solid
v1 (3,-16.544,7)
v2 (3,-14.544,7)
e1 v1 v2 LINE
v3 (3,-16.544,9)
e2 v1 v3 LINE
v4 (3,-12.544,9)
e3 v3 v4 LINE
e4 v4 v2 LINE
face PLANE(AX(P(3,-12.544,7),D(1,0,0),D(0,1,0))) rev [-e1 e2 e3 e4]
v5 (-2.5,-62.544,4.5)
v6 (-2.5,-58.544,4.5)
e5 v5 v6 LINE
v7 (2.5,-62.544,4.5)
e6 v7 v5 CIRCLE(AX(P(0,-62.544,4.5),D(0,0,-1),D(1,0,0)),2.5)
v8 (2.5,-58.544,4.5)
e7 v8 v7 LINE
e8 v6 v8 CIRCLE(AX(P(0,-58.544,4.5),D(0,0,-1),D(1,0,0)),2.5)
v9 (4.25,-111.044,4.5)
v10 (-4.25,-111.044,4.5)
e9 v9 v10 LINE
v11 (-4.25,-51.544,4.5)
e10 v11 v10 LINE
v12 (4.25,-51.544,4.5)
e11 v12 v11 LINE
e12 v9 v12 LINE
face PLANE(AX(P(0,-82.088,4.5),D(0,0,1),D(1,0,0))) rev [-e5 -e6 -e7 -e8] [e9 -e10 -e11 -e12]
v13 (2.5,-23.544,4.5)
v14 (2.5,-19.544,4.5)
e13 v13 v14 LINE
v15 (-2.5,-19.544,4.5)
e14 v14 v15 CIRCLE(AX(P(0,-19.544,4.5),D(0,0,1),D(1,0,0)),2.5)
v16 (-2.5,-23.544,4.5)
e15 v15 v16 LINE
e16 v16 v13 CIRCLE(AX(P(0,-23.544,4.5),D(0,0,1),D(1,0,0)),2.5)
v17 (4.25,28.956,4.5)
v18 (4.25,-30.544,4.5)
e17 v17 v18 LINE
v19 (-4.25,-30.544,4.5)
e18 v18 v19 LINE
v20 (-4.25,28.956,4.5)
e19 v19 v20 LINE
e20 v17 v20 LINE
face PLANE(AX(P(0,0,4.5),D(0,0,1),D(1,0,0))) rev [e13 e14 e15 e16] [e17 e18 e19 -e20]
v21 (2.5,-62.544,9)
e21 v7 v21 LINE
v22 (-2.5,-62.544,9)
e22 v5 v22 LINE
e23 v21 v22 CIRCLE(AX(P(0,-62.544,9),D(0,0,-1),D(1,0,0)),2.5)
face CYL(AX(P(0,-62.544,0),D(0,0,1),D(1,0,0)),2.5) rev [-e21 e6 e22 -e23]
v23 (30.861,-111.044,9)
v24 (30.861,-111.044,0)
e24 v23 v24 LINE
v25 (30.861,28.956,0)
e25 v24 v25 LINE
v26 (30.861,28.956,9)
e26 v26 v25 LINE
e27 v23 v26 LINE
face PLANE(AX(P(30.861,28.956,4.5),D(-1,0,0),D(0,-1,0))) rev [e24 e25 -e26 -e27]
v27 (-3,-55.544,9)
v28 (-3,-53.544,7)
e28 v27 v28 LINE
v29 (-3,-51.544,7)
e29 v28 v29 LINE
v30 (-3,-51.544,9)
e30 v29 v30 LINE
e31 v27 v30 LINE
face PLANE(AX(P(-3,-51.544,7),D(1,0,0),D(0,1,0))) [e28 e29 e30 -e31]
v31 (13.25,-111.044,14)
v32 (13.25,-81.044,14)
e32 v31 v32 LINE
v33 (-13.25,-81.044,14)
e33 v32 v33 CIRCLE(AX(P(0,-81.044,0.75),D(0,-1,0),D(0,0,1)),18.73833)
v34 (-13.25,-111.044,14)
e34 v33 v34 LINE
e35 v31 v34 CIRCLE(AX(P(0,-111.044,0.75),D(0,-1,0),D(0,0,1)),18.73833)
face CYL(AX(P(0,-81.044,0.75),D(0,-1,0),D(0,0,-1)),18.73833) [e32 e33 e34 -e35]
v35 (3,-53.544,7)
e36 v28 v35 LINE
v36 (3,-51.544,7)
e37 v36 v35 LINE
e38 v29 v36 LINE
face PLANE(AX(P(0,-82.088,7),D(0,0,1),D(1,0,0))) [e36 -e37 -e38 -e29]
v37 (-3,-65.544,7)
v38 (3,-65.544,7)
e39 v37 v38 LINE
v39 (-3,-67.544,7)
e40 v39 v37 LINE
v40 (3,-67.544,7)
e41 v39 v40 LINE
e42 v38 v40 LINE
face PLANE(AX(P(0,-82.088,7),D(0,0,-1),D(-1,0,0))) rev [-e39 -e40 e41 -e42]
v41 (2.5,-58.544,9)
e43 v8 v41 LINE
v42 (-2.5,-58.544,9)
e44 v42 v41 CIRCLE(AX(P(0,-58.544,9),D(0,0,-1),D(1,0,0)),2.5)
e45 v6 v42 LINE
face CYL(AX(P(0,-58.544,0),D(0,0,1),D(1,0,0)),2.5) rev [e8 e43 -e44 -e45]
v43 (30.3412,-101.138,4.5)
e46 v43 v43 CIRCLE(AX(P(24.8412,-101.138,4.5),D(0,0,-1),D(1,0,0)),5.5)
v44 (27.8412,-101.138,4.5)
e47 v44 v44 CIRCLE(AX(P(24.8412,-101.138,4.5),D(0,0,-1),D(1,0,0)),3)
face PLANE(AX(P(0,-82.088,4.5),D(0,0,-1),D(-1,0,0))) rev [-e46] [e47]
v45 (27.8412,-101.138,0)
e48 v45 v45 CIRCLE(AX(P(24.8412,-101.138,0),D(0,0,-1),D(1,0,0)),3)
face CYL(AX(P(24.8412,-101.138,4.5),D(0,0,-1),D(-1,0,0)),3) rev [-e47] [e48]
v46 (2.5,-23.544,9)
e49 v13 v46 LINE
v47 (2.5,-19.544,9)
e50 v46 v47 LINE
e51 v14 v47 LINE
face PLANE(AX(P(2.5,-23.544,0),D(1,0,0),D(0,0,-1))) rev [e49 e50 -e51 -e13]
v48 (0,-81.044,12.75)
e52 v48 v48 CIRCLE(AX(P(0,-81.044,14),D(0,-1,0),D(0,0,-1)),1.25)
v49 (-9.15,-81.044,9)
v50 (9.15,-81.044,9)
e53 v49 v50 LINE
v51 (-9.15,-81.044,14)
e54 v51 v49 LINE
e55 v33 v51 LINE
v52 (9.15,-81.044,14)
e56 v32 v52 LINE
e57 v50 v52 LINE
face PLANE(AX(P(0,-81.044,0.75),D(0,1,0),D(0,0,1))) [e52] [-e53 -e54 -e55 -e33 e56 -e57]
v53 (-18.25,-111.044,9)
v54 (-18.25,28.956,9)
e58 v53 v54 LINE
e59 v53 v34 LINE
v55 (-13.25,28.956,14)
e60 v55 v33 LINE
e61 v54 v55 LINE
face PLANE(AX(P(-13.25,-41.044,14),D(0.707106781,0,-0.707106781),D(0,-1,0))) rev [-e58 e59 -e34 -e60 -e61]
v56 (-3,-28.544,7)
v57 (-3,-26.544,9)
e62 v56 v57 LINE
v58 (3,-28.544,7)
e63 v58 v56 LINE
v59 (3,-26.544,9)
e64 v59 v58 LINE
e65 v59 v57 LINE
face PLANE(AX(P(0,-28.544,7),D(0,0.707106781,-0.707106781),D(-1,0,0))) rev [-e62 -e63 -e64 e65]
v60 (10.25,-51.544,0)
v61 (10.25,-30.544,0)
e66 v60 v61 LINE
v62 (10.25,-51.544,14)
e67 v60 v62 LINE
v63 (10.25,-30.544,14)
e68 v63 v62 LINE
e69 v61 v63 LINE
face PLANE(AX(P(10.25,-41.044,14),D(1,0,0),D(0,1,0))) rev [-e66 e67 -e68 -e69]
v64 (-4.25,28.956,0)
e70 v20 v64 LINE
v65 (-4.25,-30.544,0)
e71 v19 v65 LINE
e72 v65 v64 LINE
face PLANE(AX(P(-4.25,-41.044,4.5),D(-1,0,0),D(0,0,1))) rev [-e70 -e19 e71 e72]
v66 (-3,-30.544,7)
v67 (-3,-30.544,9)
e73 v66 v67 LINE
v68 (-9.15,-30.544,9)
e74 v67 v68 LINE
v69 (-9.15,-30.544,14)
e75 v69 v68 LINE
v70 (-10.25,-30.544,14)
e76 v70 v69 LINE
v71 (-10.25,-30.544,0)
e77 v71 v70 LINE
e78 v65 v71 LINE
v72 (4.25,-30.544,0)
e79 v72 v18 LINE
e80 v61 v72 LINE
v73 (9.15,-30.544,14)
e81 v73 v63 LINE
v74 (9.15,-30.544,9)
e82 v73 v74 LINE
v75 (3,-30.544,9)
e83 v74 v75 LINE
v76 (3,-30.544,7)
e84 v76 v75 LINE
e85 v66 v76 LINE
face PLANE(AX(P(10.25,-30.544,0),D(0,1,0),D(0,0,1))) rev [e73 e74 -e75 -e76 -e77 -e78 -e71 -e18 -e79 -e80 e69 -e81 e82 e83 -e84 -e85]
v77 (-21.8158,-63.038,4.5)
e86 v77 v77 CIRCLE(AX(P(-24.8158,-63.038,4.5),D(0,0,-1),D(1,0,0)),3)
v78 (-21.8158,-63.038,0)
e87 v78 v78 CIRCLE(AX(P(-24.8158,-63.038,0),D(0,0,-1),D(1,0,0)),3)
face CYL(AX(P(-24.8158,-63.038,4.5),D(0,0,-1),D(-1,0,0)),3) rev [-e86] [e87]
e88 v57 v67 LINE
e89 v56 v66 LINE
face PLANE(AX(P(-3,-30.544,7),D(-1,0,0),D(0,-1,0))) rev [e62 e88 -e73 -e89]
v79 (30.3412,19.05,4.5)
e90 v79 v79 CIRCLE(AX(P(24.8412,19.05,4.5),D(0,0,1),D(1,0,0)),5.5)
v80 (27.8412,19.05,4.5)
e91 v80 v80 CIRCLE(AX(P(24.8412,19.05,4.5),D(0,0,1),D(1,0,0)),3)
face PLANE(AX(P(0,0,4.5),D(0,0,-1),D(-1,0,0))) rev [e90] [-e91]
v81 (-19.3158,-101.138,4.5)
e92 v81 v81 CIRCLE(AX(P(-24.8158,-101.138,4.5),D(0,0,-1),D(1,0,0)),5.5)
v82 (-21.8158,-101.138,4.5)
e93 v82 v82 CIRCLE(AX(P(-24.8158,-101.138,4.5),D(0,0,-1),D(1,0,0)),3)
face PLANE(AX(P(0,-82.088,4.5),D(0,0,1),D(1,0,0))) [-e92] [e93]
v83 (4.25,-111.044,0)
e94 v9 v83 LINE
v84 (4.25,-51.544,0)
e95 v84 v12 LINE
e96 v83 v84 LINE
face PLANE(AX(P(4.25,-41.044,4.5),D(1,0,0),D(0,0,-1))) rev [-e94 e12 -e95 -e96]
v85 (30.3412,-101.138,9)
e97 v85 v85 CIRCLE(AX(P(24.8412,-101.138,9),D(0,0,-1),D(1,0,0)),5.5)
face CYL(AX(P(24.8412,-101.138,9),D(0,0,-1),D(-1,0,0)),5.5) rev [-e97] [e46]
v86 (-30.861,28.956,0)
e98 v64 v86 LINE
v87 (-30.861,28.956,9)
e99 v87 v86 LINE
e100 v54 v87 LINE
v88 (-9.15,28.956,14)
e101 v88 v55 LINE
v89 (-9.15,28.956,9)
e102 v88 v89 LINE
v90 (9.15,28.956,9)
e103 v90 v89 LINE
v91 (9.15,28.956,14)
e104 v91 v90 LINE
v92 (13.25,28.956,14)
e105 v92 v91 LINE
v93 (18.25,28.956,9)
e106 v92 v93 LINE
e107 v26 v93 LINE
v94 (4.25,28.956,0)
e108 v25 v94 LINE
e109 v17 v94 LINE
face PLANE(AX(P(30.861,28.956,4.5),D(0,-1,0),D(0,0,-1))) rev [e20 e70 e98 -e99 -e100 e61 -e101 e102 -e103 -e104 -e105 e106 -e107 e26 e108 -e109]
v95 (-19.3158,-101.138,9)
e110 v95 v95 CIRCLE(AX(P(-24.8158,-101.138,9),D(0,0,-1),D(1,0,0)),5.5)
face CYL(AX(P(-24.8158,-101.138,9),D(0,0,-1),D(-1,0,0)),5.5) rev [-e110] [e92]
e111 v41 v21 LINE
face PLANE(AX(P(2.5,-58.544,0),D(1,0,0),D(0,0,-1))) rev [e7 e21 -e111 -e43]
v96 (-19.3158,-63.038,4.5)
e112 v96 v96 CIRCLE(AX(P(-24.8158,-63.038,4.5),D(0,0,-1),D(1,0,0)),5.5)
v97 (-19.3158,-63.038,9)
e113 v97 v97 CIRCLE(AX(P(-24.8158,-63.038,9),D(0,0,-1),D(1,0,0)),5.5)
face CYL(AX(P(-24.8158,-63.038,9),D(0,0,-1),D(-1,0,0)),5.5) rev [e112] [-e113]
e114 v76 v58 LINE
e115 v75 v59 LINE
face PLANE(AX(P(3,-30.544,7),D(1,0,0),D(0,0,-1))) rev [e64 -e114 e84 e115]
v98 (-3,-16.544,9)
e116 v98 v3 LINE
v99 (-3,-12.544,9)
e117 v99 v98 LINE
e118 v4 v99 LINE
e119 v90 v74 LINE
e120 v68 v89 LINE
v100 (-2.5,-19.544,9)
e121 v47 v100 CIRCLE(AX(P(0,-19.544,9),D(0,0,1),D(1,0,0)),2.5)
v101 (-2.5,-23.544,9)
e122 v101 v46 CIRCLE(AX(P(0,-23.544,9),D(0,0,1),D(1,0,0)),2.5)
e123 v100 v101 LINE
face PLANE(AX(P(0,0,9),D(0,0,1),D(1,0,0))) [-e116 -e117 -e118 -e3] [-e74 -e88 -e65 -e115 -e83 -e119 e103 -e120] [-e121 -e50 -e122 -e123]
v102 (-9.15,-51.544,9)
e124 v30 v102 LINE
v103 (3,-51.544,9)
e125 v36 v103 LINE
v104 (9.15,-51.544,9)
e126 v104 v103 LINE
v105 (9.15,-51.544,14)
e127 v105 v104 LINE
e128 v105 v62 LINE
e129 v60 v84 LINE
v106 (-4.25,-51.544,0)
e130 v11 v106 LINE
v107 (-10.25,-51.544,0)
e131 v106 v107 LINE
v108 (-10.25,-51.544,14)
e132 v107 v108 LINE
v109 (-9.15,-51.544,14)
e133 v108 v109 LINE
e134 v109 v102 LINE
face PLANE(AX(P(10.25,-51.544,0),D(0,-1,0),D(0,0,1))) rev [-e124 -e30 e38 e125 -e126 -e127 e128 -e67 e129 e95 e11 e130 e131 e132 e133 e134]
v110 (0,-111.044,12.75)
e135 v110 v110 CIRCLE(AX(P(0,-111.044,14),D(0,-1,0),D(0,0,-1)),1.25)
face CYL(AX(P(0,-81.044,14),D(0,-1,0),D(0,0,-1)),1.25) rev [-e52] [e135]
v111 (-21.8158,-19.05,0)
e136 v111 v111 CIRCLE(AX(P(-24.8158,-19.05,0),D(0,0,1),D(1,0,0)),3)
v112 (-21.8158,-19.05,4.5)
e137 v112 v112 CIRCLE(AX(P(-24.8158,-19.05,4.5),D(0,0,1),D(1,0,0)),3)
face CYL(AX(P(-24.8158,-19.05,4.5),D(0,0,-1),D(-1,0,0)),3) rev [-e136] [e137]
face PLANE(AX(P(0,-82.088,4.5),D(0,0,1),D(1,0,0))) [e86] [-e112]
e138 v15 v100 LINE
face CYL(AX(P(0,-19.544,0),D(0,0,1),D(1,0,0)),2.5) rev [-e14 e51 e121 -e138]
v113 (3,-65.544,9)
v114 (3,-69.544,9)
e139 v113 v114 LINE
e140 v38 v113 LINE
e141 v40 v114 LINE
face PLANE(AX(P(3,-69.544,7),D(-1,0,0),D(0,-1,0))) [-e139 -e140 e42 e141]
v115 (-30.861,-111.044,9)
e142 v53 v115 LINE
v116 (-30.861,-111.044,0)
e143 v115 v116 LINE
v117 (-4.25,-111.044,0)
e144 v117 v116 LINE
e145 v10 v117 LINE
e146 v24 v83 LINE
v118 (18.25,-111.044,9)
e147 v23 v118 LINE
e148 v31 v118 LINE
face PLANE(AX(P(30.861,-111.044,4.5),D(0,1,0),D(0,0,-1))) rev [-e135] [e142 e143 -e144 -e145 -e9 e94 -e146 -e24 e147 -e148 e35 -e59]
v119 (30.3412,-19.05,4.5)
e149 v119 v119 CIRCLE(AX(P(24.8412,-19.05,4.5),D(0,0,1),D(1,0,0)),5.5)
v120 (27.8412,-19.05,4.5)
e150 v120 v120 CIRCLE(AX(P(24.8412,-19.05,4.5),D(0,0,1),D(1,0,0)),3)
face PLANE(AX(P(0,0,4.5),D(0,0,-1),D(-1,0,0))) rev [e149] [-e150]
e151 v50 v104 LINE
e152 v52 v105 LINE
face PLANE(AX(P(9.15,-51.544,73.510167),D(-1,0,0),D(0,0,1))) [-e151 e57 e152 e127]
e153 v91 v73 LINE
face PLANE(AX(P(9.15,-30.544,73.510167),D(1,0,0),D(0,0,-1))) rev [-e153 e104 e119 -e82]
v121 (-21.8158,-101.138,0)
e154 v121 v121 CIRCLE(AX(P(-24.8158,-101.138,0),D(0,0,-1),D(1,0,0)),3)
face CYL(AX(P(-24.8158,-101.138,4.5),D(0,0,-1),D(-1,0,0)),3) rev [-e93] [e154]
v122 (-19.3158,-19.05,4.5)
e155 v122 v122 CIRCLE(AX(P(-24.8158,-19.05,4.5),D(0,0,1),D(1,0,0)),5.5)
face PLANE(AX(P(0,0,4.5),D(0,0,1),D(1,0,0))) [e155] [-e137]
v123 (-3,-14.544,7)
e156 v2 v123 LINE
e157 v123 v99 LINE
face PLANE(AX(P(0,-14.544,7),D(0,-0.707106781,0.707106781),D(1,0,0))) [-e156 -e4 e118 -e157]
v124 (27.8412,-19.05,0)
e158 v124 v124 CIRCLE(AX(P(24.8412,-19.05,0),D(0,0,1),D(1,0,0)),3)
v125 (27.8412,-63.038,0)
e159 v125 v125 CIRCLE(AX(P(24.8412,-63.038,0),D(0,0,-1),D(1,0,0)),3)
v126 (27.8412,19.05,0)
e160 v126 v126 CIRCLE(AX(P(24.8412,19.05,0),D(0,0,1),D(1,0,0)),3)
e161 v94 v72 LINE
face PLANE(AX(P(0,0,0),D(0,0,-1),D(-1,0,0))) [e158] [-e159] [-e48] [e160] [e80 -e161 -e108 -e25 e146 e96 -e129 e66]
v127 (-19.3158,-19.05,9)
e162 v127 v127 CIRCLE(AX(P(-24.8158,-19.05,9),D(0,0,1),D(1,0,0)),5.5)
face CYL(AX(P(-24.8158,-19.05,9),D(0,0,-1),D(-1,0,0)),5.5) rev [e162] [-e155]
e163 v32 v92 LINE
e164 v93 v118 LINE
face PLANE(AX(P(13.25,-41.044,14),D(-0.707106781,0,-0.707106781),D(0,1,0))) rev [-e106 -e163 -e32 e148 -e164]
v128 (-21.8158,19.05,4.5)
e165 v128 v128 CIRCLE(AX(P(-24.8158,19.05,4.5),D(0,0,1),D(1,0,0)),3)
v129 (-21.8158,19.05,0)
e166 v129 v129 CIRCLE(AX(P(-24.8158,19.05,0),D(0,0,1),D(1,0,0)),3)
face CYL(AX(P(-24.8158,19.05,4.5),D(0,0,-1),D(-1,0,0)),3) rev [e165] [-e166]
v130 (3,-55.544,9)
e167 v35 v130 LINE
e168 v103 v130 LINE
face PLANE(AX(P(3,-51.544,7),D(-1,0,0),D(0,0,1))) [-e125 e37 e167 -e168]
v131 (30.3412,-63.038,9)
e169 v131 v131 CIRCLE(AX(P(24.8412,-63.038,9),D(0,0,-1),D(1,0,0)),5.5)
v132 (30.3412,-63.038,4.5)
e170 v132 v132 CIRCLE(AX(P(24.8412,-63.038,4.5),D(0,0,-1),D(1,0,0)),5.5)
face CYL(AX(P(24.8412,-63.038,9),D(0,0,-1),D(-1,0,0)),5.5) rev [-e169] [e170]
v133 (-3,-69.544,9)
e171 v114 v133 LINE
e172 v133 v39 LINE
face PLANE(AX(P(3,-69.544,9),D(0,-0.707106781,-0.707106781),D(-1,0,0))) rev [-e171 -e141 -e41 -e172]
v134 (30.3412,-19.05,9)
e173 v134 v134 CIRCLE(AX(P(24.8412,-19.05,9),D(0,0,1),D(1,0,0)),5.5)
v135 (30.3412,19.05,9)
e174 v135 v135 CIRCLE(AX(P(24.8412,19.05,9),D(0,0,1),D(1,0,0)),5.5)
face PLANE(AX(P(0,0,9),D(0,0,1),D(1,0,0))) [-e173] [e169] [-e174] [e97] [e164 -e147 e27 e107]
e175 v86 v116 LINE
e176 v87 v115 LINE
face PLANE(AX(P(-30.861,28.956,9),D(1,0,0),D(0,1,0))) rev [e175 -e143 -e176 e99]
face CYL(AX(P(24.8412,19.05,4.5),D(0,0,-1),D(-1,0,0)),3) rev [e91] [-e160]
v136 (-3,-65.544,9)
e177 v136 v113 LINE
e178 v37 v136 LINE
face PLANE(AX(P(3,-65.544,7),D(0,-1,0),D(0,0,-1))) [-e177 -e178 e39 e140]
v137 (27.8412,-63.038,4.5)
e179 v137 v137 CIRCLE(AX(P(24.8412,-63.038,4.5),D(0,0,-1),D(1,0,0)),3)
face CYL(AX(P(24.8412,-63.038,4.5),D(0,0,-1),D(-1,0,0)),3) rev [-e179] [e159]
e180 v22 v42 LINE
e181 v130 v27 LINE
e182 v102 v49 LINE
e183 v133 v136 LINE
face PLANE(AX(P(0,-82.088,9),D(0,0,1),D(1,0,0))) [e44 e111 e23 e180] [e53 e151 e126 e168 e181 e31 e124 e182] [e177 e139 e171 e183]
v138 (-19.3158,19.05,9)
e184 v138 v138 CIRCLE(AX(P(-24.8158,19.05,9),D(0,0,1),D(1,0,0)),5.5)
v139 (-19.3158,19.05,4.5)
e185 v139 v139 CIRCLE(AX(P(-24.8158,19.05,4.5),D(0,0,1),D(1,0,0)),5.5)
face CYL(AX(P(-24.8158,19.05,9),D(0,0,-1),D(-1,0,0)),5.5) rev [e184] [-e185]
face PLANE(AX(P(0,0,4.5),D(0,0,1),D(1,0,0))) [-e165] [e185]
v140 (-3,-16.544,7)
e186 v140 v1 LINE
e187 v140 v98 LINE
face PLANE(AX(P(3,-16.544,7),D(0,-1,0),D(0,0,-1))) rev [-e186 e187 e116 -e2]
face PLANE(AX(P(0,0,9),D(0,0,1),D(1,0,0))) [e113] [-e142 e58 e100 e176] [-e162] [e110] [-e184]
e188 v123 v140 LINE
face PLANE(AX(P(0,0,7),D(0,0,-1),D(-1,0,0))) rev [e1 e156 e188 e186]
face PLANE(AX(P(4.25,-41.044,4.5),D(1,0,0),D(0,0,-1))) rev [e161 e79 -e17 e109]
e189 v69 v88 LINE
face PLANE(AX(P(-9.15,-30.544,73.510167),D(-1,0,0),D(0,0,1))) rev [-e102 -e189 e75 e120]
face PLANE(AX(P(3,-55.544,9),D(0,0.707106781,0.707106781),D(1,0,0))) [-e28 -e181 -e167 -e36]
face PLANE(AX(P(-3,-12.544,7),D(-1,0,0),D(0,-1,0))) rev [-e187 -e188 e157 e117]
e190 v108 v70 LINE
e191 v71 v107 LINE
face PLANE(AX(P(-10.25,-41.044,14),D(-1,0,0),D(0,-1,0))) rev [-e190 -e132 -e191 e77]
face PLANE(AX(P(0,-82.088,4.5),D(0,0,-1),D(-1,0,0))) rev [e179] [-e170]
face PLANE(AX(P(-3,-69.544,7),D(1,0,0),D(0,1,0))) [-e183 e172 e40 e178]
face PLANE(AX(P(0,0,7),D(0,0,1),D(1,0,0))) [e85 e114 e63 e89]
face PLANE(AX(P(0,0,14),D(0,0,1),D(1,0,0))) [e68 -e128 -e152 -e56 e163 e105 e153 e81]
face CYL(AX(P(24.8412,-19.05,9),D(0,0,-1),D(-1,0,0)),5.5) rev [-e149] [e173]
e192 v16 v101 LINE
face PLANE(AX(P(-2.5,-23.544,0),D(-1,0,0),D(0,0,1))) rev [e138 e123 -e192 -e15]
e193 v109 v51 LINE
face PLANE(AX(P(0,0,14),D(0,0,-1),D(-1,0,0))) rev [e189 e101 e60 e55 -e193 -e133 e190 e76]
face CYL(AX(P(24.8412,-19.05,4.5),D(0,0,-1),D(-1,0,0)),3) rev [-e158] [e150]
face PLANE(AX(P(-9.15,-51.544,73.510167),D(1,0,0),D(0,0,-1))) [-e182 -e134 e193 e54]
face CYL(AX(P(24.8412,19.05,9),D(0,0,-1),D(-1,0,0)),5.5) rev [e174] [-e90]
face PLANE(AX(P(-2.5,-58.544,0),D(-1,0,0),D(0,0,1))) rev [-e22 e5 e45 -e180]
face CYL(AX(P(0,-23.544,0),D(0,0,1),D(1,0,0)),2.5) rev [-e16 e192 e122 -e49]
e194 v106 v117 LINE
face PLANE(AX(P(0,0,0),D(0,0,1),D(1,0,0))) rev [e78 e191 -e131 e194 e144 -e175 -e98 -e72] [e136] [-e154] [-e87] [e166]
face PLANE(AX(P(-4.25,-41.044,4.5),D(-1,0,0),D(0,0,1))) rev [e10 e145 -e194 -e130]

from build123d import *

# Parameters (mm, degrees)
SKETCH1_W                = 26.611
SKETCH1_H                = 70
SKETCH1_R                = 3
BOSS_EXTRUDE1_DEPTH      = 4.5
BOSS_EXTRUDE1_2_DEPTH    = 4.5
SKETCH2_W                = 61.722
SKETCH2_H                = 70
SKETCH2_R                = 5.5
BOSS_EXTRUDE2_DEPTH      = 4.5
SKETCH3_W                = 3
SKETCH3_H                = 70
BOSS_EXTRUDE3_DEPTH      = 5
CHAMFER1_SIZE            = 5
CUT_EXTRUDE1_DEPTH       = 53.134549552
CUT_EXTRUDE1_DEPTH_BACK  = 53.134549552
SKETCH4_W                = 20.5
SKETCH4_H                = 10.5
MIRROR1_OUTLINE_R        = 5.5
MIRROR1_DEPTH            = 9
MIRROR1_START            = 4.5
MIRROR1_2_OUTLINE_W      = 8.5
MIRROR1_2_OUTLINE_H      = 59.5
MIRROR1_2_DEPTH          = 4.5
MIRROR1_3_OUTLINE_R      = 5.5
MIRROR1_3_OUTLINE_R_2    = 3
MIRROR1_3_DEPTH          = 4.5
MIRROR1_START_2          = -111.044
MIRROR1_4_DEPTH          = 70
SKETCH5_R                = 1.25
BOSS_EXTRUDE4_DEPTH      = 30
SKETCH6_W                = 1.1
SKETCH6_H                = 59.5
BOSS_EXTRUDE5_DEPTH      = 5
SKETCH7_W                = 6
SKETCH7_H                = 4
CUT_EXTRUDE2_DEPTH       = 2
CHAMFER2_SIZE            = 2
CHAMFER3_SIZE            = 2
CHAMFER2_OF_MIRROR2_SIZE = 2
CHAMFER3_OF_MIRROR2_SIZE = 2


with BuildPart() as part:
    # Sketch1 → Boss-Extrude1 (new body)
    with BuildSketch(Plane.XY):
        with Locations((17.5555, -6.044)):
            Rectangle(SKETCH1_W, SKETCH1_H)
        with Locations((24.8412, 19.05)):
            Circle(SKETCH1_R, mode=Mode.SUBTRACT)
        with Locations((24.8412, -19.05)):
            Circle(SKETCH1_R, mode=Mode.SUBTRACT)
    extrude(amount=BOSS_EXTRUDE1_DEPTH)



with BuildPart() as body_2:
    # Sketch1 → Boss-Extrude1 2 (new body)
    with BuildSketch(Plane.XY):
        with Locations((-17.5555, -6.044)):
            Rectangle(SKETCH1_W, SKETCH1_H)
        with Locations((-24.8158, -19.05)):
            Circle(SKETCH1_R, mode=Mode.SUBTRACT)
        with Locations((-24.8158, 19.05)):
            Circle(SKETCH1_R, mode=Mode.SUBTRACT)
    extrude(amount=BOSS_EXTRUDE1_2_DEPTH)


with BuildPart() as part_1:
    add(part.part)

    add(body_2.part)  # Boss-Extrude2 merges body 2
    # Sketch2 → Boss-Extrude2 (add)
    with BuildSketch(Plane.XY.offset(4.5)):
        with Locations((0, -6.044)):
            Rectangle(SKETCH2_W, SKETCH2_H)
        with Locations((24.8412, -19.05)):
            Circle(SKETCH2_R, mode=Mode.SUBTRACT)
        with Locations((-24.8158, -19.05)):
            Circle(SKETCH2_R, mode=Mode.SUBTRACT)
        with Locations((-24.8158, 19.05)):
            Circle(SKETCH2_R, mode=Mode.SUBTRACT)
        with Locations((24.8412, 19.05)):
            Circle(SKETCH2_R, mode=Mode.SUBTRACT)
    extrude(amount=BOSS_EXTRUDE2_DEPTH)

    # Sketch3 → Boss-Extrude3 (add)
    with BuildSketch(Plane.XY.offset(9)):
        with Locations((11.75, -6.044)):
            Rectangle(SKETCH3_W, SKETCH3_H)
        with Locations((-11.75, -6.044)):
            Rectangle(SKETCH3_W, SKETCH3_H)
    extrude(amount=BOSS_EXTRUDE3_DEPTH)

    # Chamfer1
    chamfer1_edges = [part_1.edges().sort_by_distance(p)[0] for p in [
        (-13.25, -6.044, 9),
        (13.25, -6.044, 9),
    ]]
    chamfer(chamfer1_edges, length=CHAMFER1_SIZE - 0.0001)  # a hair under: the kernel refuses the full size

    # Sketch4 → Cut-Extrude1 (cut, two sides: drawn at the far end of the back side and taken through both)
    with BuildSketch(Plane.XY.offset(9).offset(-CUT_EXTRUDE1_DEPTH_BACK)):
        with Locations((0, -35.794)):
            Rectangle(SKETCH4_W, SKETCH4_H)
        with BuildLine():
            Line((-2.5, -23.544), (-2.5, -19.544))
            ThreePointArc((-2.5, -19.544), (0, -17.044), (2.5, -19.544))
            Line((2.5, -19.544), (2.5, -23.544))
            ThreePointArc((2.5, -23.544), (0, -26.044), (-2.5, -23.544))
        make_face()
    extrude(amount=CUT_EXTRUDE1_DEPTH + CUT_EXTRUDE1_DEPTH_BACK, mode=Mode.SUBTRACT)

    # Mirror1: read off the stored shape, not the designer's step
    # Mirror1 outline → Mirror1 (add)
    # profile 1 of 2: a face of its own
    with BuildSketch(Plane.XY):
        Polygon((30.861, -111.044), (30.861, -41.044), (10.25, -41.044), (10.25, -51.544), (4.25, -51.544), (4.25, -111.044), align=None)
        with Locations((24.8412, -101.138)):
            Circle(MIRROR1_OUTLINE_R, mode=Mode.SUBTRACT)
        with Locations((24.8412, -63.038)):
            Circle(MIRROR1_OUTLINE_R, mode=Mode.SUBTRACT)
    # profile 2 of 2: a face of its own
    with BuildSketch(Plane.XY):
        Polygon((-4.25, -111.044), (-4.25, -51.544), (-10.25, -51.544), (-10.25, -41.044), (-30.861, -41.044), (-30.861, -111.044), align=None)
        with Locations((-24.8158, -63.038)):
            Circle(MIRROR1_OUTLINE_R, mode=Mode.SUBTRACT)
        with Locations((-24.8158, -101.138)):
            Circle(MIRROR1_OUTLINE_R, mode=Mode.SUBTRACT)
    extrude(amount=MIRROR1_DEPTH)

    # Mirror1 2 outline → Mirror1 2 (add)
    with BuildSketch(Plane.XY.offset(MIRROR1_START)):
        with Locations((0, -81.294)):
            Rectangle(MIRROR1_2_OUTLINE_W, MIRROR1_2_OUTLINE_H)
        with BuildLine():
            Line((-2.5, -62.544), (-2.5, -58.544))
            ThreePointArc((-2.5, -58.544), (0, -56.044), (2.5, -58.544))
            Line((2.5, -58.544), (2.5, -62.544))
            ThreePointArc((2.5, -62.544), (0, -65.044), (-2.5, -62.544))
        make_face(mode=Mode.SUBTRACT)
    extrude(amount=MIRROR1_2_DEPTH)

    # Mirror1 3 outline → Mirror1 3 (add)
    # profile 1 of 4: a face of its own
    with BuildSketch(Plane.XY):
        with Locations((24.8412, -63.038)):
            Circle(MIRROR1_3_OUTLINE_R)
        with Locations((24.8412, -63.038)):
            Circle(MIRROR1_3_OUTLINE_R_2, mode=Mode.SUBTRACT)
    # profile 2 of 4: a face of its own
    with BuildSketch(Plane.XY):
        with Locations((-24.8158, -63.038)):
            Circle(MIRROR1_3_OUTLINE_R)
        with Locations((-24.8158, -63.038)):
            Circle(MIRROR1_3_OUTLINE_R_2, mode=Mode.SUBTRACT)
    # profile 3 of 4: a face of its own
    with BuildSketch(Plane.XY):
        with Locations((-24.8158, -101.138)):
            Circle(MIRROR1_3_OUTLINE_R)
        with Locations((-24.8158, -101.138)):
            Circle(MIRROR1_3_OUTLINE_R_2, mode=Mode.SUBTRACT)
    # profile 4 of 4: a face of its own
    with BuildSketch(Plane.XY):
        with Locations((24.8412, -101.138)):
            Circle(MIRROR1_3_OUTLINE_R)
        with Locations((24.8412, -101.138)):
            Circle(MIRROR1_3_OUTLINE_R_2, mode=Mode.SUBTRACT)
    extrude(amount=MIRROR1_3_DEPTH)

    # Mirror1 4 outline → Mirror1 4 (add)
    with BuildSketch(Plane(origin=(0, 0, 0), x_dir=(1, 0, 0), z_dir=(0, 1, 0)).offset(MIRROR1_START_2)):
        Polygon((-10.25, -14), (-10.25, -9), (-18.25, -9), (-13.25, -14), align=None)
        Polygon((10.25, -9), (10.25, -14), (13.25, -14), (18.25, -9), align=None)
    extrude(amount=MIRROR1_4_DEPTH)

    # Sketch5 → Boss-Extrude4 (add)
    with BuildSketch(Plane.XZ.offset(111.044)):
        with BuildLine():
            Line((-13.25, 14), (-13.25, 9))
            Line((-13.25, 9), (13.25, 9))
            Line((13.25, 9), (13.25, 14))
            ThreePointArc((13.25, 14), (0, 19.488329701), (-13.25, 14))
        make_face()
        with Locations(Location((0, 14, 0), (0, 0, 270))):
            Circle(SKETCH5_R, mode=Mode.SUBTRACT)
    extrude(amount=-BOSS_EXTRUDE4_DEPTH)

    # Sketch6 → Boss-Extrude5 (add)
    with BuildSketch(Plane.XY.offset(9)):
        with Locations((-9.7, -0.794)):
            Rectangle(SKETCH6_W, SKETCH6_H)
        with Locations((9.7, -0.794)):
            Rectangle(SKETCH6_W, SKETCH6_H)
    boss_extrude5 = extrude(amount=BOSS_EXTRUDE5_DEPTH)

    # Sketch7 → Cut-Extrude2 (cut)
    with BuildSketch(Plane.XY.offset(9)):
        with Locations((0, -14.544)):
            Rectangle(SKETCH7_W, SKETCH7_H)
        with Locations((0, -28.544)):
            Rectangle(SKETCH7_W, SKETCH7_H)
    cut_extrude2 = extrude(amount=-CUT_EXTRUDE2_DEPTH, mode=Mode.SUBTRACT)

    # Chamfer2
    chamfer2_edges = [part_1.edges().sort_by_distance(p)[0] for p in [
        (0, -26.544, 7),
    ]]
    chamfer(chamfer2_edges, length=CHAMFER2_SIZE - 0.0001)  # a hair under: the kernel refuses the full size

    # Chamfer3
    chamfer3_edges = [part_1.edges().sort_by_distance(p)[0] for p in [
        (0, -12.544, 7),
    ]]
    chamfer(chamfer3_edges, length=CHAMFER3_SIZE - 0.0001)  # a hair under: the kernel refuses the full size

    # Mirror2: Boss-Extrude5, Cut-Extrude2 across plane
    add(boss_extrude5.mirror(Plane(origin=(0, -41.044, 0), x_dir=(0, 0, 1), z_dir=(0, -1, 0))))
    add(cut_extrude2.mirror(Plane(origin=(0, -41.044, 0), x_dir=(0, 0, 1), z_dir=(0, -1, 0))), mode=Mode.SUBTRACT)

    # Chamfer2 of Mirror2
    chamfer2_of_mirror2_edges = [part_1.edges().sort_by_distance(p)[0] for p in [
        (0, -55.544, 7),
    ]]
    chamfer(chamfer2_of_mirror2_edges, length=CHAMFER2_OF_MIRROR2_SIZE - 0.0001)  # a hair under: the kernel refuses the full size

    # Chamfer3 of Mirror2
    chamfer3_of_mirror2_edges = [part_1.edges().sort_by_distance(p)[0] for p in [
        (0, -69.544, 7),
    ]]
    chamfer(chamfer3_of_mirror2_edges, length=CHAMFER3_OF_MIRROR2_SIZE - 0.0001)  # a hair under: the kernel refuses the full size


solid = part_1.part
